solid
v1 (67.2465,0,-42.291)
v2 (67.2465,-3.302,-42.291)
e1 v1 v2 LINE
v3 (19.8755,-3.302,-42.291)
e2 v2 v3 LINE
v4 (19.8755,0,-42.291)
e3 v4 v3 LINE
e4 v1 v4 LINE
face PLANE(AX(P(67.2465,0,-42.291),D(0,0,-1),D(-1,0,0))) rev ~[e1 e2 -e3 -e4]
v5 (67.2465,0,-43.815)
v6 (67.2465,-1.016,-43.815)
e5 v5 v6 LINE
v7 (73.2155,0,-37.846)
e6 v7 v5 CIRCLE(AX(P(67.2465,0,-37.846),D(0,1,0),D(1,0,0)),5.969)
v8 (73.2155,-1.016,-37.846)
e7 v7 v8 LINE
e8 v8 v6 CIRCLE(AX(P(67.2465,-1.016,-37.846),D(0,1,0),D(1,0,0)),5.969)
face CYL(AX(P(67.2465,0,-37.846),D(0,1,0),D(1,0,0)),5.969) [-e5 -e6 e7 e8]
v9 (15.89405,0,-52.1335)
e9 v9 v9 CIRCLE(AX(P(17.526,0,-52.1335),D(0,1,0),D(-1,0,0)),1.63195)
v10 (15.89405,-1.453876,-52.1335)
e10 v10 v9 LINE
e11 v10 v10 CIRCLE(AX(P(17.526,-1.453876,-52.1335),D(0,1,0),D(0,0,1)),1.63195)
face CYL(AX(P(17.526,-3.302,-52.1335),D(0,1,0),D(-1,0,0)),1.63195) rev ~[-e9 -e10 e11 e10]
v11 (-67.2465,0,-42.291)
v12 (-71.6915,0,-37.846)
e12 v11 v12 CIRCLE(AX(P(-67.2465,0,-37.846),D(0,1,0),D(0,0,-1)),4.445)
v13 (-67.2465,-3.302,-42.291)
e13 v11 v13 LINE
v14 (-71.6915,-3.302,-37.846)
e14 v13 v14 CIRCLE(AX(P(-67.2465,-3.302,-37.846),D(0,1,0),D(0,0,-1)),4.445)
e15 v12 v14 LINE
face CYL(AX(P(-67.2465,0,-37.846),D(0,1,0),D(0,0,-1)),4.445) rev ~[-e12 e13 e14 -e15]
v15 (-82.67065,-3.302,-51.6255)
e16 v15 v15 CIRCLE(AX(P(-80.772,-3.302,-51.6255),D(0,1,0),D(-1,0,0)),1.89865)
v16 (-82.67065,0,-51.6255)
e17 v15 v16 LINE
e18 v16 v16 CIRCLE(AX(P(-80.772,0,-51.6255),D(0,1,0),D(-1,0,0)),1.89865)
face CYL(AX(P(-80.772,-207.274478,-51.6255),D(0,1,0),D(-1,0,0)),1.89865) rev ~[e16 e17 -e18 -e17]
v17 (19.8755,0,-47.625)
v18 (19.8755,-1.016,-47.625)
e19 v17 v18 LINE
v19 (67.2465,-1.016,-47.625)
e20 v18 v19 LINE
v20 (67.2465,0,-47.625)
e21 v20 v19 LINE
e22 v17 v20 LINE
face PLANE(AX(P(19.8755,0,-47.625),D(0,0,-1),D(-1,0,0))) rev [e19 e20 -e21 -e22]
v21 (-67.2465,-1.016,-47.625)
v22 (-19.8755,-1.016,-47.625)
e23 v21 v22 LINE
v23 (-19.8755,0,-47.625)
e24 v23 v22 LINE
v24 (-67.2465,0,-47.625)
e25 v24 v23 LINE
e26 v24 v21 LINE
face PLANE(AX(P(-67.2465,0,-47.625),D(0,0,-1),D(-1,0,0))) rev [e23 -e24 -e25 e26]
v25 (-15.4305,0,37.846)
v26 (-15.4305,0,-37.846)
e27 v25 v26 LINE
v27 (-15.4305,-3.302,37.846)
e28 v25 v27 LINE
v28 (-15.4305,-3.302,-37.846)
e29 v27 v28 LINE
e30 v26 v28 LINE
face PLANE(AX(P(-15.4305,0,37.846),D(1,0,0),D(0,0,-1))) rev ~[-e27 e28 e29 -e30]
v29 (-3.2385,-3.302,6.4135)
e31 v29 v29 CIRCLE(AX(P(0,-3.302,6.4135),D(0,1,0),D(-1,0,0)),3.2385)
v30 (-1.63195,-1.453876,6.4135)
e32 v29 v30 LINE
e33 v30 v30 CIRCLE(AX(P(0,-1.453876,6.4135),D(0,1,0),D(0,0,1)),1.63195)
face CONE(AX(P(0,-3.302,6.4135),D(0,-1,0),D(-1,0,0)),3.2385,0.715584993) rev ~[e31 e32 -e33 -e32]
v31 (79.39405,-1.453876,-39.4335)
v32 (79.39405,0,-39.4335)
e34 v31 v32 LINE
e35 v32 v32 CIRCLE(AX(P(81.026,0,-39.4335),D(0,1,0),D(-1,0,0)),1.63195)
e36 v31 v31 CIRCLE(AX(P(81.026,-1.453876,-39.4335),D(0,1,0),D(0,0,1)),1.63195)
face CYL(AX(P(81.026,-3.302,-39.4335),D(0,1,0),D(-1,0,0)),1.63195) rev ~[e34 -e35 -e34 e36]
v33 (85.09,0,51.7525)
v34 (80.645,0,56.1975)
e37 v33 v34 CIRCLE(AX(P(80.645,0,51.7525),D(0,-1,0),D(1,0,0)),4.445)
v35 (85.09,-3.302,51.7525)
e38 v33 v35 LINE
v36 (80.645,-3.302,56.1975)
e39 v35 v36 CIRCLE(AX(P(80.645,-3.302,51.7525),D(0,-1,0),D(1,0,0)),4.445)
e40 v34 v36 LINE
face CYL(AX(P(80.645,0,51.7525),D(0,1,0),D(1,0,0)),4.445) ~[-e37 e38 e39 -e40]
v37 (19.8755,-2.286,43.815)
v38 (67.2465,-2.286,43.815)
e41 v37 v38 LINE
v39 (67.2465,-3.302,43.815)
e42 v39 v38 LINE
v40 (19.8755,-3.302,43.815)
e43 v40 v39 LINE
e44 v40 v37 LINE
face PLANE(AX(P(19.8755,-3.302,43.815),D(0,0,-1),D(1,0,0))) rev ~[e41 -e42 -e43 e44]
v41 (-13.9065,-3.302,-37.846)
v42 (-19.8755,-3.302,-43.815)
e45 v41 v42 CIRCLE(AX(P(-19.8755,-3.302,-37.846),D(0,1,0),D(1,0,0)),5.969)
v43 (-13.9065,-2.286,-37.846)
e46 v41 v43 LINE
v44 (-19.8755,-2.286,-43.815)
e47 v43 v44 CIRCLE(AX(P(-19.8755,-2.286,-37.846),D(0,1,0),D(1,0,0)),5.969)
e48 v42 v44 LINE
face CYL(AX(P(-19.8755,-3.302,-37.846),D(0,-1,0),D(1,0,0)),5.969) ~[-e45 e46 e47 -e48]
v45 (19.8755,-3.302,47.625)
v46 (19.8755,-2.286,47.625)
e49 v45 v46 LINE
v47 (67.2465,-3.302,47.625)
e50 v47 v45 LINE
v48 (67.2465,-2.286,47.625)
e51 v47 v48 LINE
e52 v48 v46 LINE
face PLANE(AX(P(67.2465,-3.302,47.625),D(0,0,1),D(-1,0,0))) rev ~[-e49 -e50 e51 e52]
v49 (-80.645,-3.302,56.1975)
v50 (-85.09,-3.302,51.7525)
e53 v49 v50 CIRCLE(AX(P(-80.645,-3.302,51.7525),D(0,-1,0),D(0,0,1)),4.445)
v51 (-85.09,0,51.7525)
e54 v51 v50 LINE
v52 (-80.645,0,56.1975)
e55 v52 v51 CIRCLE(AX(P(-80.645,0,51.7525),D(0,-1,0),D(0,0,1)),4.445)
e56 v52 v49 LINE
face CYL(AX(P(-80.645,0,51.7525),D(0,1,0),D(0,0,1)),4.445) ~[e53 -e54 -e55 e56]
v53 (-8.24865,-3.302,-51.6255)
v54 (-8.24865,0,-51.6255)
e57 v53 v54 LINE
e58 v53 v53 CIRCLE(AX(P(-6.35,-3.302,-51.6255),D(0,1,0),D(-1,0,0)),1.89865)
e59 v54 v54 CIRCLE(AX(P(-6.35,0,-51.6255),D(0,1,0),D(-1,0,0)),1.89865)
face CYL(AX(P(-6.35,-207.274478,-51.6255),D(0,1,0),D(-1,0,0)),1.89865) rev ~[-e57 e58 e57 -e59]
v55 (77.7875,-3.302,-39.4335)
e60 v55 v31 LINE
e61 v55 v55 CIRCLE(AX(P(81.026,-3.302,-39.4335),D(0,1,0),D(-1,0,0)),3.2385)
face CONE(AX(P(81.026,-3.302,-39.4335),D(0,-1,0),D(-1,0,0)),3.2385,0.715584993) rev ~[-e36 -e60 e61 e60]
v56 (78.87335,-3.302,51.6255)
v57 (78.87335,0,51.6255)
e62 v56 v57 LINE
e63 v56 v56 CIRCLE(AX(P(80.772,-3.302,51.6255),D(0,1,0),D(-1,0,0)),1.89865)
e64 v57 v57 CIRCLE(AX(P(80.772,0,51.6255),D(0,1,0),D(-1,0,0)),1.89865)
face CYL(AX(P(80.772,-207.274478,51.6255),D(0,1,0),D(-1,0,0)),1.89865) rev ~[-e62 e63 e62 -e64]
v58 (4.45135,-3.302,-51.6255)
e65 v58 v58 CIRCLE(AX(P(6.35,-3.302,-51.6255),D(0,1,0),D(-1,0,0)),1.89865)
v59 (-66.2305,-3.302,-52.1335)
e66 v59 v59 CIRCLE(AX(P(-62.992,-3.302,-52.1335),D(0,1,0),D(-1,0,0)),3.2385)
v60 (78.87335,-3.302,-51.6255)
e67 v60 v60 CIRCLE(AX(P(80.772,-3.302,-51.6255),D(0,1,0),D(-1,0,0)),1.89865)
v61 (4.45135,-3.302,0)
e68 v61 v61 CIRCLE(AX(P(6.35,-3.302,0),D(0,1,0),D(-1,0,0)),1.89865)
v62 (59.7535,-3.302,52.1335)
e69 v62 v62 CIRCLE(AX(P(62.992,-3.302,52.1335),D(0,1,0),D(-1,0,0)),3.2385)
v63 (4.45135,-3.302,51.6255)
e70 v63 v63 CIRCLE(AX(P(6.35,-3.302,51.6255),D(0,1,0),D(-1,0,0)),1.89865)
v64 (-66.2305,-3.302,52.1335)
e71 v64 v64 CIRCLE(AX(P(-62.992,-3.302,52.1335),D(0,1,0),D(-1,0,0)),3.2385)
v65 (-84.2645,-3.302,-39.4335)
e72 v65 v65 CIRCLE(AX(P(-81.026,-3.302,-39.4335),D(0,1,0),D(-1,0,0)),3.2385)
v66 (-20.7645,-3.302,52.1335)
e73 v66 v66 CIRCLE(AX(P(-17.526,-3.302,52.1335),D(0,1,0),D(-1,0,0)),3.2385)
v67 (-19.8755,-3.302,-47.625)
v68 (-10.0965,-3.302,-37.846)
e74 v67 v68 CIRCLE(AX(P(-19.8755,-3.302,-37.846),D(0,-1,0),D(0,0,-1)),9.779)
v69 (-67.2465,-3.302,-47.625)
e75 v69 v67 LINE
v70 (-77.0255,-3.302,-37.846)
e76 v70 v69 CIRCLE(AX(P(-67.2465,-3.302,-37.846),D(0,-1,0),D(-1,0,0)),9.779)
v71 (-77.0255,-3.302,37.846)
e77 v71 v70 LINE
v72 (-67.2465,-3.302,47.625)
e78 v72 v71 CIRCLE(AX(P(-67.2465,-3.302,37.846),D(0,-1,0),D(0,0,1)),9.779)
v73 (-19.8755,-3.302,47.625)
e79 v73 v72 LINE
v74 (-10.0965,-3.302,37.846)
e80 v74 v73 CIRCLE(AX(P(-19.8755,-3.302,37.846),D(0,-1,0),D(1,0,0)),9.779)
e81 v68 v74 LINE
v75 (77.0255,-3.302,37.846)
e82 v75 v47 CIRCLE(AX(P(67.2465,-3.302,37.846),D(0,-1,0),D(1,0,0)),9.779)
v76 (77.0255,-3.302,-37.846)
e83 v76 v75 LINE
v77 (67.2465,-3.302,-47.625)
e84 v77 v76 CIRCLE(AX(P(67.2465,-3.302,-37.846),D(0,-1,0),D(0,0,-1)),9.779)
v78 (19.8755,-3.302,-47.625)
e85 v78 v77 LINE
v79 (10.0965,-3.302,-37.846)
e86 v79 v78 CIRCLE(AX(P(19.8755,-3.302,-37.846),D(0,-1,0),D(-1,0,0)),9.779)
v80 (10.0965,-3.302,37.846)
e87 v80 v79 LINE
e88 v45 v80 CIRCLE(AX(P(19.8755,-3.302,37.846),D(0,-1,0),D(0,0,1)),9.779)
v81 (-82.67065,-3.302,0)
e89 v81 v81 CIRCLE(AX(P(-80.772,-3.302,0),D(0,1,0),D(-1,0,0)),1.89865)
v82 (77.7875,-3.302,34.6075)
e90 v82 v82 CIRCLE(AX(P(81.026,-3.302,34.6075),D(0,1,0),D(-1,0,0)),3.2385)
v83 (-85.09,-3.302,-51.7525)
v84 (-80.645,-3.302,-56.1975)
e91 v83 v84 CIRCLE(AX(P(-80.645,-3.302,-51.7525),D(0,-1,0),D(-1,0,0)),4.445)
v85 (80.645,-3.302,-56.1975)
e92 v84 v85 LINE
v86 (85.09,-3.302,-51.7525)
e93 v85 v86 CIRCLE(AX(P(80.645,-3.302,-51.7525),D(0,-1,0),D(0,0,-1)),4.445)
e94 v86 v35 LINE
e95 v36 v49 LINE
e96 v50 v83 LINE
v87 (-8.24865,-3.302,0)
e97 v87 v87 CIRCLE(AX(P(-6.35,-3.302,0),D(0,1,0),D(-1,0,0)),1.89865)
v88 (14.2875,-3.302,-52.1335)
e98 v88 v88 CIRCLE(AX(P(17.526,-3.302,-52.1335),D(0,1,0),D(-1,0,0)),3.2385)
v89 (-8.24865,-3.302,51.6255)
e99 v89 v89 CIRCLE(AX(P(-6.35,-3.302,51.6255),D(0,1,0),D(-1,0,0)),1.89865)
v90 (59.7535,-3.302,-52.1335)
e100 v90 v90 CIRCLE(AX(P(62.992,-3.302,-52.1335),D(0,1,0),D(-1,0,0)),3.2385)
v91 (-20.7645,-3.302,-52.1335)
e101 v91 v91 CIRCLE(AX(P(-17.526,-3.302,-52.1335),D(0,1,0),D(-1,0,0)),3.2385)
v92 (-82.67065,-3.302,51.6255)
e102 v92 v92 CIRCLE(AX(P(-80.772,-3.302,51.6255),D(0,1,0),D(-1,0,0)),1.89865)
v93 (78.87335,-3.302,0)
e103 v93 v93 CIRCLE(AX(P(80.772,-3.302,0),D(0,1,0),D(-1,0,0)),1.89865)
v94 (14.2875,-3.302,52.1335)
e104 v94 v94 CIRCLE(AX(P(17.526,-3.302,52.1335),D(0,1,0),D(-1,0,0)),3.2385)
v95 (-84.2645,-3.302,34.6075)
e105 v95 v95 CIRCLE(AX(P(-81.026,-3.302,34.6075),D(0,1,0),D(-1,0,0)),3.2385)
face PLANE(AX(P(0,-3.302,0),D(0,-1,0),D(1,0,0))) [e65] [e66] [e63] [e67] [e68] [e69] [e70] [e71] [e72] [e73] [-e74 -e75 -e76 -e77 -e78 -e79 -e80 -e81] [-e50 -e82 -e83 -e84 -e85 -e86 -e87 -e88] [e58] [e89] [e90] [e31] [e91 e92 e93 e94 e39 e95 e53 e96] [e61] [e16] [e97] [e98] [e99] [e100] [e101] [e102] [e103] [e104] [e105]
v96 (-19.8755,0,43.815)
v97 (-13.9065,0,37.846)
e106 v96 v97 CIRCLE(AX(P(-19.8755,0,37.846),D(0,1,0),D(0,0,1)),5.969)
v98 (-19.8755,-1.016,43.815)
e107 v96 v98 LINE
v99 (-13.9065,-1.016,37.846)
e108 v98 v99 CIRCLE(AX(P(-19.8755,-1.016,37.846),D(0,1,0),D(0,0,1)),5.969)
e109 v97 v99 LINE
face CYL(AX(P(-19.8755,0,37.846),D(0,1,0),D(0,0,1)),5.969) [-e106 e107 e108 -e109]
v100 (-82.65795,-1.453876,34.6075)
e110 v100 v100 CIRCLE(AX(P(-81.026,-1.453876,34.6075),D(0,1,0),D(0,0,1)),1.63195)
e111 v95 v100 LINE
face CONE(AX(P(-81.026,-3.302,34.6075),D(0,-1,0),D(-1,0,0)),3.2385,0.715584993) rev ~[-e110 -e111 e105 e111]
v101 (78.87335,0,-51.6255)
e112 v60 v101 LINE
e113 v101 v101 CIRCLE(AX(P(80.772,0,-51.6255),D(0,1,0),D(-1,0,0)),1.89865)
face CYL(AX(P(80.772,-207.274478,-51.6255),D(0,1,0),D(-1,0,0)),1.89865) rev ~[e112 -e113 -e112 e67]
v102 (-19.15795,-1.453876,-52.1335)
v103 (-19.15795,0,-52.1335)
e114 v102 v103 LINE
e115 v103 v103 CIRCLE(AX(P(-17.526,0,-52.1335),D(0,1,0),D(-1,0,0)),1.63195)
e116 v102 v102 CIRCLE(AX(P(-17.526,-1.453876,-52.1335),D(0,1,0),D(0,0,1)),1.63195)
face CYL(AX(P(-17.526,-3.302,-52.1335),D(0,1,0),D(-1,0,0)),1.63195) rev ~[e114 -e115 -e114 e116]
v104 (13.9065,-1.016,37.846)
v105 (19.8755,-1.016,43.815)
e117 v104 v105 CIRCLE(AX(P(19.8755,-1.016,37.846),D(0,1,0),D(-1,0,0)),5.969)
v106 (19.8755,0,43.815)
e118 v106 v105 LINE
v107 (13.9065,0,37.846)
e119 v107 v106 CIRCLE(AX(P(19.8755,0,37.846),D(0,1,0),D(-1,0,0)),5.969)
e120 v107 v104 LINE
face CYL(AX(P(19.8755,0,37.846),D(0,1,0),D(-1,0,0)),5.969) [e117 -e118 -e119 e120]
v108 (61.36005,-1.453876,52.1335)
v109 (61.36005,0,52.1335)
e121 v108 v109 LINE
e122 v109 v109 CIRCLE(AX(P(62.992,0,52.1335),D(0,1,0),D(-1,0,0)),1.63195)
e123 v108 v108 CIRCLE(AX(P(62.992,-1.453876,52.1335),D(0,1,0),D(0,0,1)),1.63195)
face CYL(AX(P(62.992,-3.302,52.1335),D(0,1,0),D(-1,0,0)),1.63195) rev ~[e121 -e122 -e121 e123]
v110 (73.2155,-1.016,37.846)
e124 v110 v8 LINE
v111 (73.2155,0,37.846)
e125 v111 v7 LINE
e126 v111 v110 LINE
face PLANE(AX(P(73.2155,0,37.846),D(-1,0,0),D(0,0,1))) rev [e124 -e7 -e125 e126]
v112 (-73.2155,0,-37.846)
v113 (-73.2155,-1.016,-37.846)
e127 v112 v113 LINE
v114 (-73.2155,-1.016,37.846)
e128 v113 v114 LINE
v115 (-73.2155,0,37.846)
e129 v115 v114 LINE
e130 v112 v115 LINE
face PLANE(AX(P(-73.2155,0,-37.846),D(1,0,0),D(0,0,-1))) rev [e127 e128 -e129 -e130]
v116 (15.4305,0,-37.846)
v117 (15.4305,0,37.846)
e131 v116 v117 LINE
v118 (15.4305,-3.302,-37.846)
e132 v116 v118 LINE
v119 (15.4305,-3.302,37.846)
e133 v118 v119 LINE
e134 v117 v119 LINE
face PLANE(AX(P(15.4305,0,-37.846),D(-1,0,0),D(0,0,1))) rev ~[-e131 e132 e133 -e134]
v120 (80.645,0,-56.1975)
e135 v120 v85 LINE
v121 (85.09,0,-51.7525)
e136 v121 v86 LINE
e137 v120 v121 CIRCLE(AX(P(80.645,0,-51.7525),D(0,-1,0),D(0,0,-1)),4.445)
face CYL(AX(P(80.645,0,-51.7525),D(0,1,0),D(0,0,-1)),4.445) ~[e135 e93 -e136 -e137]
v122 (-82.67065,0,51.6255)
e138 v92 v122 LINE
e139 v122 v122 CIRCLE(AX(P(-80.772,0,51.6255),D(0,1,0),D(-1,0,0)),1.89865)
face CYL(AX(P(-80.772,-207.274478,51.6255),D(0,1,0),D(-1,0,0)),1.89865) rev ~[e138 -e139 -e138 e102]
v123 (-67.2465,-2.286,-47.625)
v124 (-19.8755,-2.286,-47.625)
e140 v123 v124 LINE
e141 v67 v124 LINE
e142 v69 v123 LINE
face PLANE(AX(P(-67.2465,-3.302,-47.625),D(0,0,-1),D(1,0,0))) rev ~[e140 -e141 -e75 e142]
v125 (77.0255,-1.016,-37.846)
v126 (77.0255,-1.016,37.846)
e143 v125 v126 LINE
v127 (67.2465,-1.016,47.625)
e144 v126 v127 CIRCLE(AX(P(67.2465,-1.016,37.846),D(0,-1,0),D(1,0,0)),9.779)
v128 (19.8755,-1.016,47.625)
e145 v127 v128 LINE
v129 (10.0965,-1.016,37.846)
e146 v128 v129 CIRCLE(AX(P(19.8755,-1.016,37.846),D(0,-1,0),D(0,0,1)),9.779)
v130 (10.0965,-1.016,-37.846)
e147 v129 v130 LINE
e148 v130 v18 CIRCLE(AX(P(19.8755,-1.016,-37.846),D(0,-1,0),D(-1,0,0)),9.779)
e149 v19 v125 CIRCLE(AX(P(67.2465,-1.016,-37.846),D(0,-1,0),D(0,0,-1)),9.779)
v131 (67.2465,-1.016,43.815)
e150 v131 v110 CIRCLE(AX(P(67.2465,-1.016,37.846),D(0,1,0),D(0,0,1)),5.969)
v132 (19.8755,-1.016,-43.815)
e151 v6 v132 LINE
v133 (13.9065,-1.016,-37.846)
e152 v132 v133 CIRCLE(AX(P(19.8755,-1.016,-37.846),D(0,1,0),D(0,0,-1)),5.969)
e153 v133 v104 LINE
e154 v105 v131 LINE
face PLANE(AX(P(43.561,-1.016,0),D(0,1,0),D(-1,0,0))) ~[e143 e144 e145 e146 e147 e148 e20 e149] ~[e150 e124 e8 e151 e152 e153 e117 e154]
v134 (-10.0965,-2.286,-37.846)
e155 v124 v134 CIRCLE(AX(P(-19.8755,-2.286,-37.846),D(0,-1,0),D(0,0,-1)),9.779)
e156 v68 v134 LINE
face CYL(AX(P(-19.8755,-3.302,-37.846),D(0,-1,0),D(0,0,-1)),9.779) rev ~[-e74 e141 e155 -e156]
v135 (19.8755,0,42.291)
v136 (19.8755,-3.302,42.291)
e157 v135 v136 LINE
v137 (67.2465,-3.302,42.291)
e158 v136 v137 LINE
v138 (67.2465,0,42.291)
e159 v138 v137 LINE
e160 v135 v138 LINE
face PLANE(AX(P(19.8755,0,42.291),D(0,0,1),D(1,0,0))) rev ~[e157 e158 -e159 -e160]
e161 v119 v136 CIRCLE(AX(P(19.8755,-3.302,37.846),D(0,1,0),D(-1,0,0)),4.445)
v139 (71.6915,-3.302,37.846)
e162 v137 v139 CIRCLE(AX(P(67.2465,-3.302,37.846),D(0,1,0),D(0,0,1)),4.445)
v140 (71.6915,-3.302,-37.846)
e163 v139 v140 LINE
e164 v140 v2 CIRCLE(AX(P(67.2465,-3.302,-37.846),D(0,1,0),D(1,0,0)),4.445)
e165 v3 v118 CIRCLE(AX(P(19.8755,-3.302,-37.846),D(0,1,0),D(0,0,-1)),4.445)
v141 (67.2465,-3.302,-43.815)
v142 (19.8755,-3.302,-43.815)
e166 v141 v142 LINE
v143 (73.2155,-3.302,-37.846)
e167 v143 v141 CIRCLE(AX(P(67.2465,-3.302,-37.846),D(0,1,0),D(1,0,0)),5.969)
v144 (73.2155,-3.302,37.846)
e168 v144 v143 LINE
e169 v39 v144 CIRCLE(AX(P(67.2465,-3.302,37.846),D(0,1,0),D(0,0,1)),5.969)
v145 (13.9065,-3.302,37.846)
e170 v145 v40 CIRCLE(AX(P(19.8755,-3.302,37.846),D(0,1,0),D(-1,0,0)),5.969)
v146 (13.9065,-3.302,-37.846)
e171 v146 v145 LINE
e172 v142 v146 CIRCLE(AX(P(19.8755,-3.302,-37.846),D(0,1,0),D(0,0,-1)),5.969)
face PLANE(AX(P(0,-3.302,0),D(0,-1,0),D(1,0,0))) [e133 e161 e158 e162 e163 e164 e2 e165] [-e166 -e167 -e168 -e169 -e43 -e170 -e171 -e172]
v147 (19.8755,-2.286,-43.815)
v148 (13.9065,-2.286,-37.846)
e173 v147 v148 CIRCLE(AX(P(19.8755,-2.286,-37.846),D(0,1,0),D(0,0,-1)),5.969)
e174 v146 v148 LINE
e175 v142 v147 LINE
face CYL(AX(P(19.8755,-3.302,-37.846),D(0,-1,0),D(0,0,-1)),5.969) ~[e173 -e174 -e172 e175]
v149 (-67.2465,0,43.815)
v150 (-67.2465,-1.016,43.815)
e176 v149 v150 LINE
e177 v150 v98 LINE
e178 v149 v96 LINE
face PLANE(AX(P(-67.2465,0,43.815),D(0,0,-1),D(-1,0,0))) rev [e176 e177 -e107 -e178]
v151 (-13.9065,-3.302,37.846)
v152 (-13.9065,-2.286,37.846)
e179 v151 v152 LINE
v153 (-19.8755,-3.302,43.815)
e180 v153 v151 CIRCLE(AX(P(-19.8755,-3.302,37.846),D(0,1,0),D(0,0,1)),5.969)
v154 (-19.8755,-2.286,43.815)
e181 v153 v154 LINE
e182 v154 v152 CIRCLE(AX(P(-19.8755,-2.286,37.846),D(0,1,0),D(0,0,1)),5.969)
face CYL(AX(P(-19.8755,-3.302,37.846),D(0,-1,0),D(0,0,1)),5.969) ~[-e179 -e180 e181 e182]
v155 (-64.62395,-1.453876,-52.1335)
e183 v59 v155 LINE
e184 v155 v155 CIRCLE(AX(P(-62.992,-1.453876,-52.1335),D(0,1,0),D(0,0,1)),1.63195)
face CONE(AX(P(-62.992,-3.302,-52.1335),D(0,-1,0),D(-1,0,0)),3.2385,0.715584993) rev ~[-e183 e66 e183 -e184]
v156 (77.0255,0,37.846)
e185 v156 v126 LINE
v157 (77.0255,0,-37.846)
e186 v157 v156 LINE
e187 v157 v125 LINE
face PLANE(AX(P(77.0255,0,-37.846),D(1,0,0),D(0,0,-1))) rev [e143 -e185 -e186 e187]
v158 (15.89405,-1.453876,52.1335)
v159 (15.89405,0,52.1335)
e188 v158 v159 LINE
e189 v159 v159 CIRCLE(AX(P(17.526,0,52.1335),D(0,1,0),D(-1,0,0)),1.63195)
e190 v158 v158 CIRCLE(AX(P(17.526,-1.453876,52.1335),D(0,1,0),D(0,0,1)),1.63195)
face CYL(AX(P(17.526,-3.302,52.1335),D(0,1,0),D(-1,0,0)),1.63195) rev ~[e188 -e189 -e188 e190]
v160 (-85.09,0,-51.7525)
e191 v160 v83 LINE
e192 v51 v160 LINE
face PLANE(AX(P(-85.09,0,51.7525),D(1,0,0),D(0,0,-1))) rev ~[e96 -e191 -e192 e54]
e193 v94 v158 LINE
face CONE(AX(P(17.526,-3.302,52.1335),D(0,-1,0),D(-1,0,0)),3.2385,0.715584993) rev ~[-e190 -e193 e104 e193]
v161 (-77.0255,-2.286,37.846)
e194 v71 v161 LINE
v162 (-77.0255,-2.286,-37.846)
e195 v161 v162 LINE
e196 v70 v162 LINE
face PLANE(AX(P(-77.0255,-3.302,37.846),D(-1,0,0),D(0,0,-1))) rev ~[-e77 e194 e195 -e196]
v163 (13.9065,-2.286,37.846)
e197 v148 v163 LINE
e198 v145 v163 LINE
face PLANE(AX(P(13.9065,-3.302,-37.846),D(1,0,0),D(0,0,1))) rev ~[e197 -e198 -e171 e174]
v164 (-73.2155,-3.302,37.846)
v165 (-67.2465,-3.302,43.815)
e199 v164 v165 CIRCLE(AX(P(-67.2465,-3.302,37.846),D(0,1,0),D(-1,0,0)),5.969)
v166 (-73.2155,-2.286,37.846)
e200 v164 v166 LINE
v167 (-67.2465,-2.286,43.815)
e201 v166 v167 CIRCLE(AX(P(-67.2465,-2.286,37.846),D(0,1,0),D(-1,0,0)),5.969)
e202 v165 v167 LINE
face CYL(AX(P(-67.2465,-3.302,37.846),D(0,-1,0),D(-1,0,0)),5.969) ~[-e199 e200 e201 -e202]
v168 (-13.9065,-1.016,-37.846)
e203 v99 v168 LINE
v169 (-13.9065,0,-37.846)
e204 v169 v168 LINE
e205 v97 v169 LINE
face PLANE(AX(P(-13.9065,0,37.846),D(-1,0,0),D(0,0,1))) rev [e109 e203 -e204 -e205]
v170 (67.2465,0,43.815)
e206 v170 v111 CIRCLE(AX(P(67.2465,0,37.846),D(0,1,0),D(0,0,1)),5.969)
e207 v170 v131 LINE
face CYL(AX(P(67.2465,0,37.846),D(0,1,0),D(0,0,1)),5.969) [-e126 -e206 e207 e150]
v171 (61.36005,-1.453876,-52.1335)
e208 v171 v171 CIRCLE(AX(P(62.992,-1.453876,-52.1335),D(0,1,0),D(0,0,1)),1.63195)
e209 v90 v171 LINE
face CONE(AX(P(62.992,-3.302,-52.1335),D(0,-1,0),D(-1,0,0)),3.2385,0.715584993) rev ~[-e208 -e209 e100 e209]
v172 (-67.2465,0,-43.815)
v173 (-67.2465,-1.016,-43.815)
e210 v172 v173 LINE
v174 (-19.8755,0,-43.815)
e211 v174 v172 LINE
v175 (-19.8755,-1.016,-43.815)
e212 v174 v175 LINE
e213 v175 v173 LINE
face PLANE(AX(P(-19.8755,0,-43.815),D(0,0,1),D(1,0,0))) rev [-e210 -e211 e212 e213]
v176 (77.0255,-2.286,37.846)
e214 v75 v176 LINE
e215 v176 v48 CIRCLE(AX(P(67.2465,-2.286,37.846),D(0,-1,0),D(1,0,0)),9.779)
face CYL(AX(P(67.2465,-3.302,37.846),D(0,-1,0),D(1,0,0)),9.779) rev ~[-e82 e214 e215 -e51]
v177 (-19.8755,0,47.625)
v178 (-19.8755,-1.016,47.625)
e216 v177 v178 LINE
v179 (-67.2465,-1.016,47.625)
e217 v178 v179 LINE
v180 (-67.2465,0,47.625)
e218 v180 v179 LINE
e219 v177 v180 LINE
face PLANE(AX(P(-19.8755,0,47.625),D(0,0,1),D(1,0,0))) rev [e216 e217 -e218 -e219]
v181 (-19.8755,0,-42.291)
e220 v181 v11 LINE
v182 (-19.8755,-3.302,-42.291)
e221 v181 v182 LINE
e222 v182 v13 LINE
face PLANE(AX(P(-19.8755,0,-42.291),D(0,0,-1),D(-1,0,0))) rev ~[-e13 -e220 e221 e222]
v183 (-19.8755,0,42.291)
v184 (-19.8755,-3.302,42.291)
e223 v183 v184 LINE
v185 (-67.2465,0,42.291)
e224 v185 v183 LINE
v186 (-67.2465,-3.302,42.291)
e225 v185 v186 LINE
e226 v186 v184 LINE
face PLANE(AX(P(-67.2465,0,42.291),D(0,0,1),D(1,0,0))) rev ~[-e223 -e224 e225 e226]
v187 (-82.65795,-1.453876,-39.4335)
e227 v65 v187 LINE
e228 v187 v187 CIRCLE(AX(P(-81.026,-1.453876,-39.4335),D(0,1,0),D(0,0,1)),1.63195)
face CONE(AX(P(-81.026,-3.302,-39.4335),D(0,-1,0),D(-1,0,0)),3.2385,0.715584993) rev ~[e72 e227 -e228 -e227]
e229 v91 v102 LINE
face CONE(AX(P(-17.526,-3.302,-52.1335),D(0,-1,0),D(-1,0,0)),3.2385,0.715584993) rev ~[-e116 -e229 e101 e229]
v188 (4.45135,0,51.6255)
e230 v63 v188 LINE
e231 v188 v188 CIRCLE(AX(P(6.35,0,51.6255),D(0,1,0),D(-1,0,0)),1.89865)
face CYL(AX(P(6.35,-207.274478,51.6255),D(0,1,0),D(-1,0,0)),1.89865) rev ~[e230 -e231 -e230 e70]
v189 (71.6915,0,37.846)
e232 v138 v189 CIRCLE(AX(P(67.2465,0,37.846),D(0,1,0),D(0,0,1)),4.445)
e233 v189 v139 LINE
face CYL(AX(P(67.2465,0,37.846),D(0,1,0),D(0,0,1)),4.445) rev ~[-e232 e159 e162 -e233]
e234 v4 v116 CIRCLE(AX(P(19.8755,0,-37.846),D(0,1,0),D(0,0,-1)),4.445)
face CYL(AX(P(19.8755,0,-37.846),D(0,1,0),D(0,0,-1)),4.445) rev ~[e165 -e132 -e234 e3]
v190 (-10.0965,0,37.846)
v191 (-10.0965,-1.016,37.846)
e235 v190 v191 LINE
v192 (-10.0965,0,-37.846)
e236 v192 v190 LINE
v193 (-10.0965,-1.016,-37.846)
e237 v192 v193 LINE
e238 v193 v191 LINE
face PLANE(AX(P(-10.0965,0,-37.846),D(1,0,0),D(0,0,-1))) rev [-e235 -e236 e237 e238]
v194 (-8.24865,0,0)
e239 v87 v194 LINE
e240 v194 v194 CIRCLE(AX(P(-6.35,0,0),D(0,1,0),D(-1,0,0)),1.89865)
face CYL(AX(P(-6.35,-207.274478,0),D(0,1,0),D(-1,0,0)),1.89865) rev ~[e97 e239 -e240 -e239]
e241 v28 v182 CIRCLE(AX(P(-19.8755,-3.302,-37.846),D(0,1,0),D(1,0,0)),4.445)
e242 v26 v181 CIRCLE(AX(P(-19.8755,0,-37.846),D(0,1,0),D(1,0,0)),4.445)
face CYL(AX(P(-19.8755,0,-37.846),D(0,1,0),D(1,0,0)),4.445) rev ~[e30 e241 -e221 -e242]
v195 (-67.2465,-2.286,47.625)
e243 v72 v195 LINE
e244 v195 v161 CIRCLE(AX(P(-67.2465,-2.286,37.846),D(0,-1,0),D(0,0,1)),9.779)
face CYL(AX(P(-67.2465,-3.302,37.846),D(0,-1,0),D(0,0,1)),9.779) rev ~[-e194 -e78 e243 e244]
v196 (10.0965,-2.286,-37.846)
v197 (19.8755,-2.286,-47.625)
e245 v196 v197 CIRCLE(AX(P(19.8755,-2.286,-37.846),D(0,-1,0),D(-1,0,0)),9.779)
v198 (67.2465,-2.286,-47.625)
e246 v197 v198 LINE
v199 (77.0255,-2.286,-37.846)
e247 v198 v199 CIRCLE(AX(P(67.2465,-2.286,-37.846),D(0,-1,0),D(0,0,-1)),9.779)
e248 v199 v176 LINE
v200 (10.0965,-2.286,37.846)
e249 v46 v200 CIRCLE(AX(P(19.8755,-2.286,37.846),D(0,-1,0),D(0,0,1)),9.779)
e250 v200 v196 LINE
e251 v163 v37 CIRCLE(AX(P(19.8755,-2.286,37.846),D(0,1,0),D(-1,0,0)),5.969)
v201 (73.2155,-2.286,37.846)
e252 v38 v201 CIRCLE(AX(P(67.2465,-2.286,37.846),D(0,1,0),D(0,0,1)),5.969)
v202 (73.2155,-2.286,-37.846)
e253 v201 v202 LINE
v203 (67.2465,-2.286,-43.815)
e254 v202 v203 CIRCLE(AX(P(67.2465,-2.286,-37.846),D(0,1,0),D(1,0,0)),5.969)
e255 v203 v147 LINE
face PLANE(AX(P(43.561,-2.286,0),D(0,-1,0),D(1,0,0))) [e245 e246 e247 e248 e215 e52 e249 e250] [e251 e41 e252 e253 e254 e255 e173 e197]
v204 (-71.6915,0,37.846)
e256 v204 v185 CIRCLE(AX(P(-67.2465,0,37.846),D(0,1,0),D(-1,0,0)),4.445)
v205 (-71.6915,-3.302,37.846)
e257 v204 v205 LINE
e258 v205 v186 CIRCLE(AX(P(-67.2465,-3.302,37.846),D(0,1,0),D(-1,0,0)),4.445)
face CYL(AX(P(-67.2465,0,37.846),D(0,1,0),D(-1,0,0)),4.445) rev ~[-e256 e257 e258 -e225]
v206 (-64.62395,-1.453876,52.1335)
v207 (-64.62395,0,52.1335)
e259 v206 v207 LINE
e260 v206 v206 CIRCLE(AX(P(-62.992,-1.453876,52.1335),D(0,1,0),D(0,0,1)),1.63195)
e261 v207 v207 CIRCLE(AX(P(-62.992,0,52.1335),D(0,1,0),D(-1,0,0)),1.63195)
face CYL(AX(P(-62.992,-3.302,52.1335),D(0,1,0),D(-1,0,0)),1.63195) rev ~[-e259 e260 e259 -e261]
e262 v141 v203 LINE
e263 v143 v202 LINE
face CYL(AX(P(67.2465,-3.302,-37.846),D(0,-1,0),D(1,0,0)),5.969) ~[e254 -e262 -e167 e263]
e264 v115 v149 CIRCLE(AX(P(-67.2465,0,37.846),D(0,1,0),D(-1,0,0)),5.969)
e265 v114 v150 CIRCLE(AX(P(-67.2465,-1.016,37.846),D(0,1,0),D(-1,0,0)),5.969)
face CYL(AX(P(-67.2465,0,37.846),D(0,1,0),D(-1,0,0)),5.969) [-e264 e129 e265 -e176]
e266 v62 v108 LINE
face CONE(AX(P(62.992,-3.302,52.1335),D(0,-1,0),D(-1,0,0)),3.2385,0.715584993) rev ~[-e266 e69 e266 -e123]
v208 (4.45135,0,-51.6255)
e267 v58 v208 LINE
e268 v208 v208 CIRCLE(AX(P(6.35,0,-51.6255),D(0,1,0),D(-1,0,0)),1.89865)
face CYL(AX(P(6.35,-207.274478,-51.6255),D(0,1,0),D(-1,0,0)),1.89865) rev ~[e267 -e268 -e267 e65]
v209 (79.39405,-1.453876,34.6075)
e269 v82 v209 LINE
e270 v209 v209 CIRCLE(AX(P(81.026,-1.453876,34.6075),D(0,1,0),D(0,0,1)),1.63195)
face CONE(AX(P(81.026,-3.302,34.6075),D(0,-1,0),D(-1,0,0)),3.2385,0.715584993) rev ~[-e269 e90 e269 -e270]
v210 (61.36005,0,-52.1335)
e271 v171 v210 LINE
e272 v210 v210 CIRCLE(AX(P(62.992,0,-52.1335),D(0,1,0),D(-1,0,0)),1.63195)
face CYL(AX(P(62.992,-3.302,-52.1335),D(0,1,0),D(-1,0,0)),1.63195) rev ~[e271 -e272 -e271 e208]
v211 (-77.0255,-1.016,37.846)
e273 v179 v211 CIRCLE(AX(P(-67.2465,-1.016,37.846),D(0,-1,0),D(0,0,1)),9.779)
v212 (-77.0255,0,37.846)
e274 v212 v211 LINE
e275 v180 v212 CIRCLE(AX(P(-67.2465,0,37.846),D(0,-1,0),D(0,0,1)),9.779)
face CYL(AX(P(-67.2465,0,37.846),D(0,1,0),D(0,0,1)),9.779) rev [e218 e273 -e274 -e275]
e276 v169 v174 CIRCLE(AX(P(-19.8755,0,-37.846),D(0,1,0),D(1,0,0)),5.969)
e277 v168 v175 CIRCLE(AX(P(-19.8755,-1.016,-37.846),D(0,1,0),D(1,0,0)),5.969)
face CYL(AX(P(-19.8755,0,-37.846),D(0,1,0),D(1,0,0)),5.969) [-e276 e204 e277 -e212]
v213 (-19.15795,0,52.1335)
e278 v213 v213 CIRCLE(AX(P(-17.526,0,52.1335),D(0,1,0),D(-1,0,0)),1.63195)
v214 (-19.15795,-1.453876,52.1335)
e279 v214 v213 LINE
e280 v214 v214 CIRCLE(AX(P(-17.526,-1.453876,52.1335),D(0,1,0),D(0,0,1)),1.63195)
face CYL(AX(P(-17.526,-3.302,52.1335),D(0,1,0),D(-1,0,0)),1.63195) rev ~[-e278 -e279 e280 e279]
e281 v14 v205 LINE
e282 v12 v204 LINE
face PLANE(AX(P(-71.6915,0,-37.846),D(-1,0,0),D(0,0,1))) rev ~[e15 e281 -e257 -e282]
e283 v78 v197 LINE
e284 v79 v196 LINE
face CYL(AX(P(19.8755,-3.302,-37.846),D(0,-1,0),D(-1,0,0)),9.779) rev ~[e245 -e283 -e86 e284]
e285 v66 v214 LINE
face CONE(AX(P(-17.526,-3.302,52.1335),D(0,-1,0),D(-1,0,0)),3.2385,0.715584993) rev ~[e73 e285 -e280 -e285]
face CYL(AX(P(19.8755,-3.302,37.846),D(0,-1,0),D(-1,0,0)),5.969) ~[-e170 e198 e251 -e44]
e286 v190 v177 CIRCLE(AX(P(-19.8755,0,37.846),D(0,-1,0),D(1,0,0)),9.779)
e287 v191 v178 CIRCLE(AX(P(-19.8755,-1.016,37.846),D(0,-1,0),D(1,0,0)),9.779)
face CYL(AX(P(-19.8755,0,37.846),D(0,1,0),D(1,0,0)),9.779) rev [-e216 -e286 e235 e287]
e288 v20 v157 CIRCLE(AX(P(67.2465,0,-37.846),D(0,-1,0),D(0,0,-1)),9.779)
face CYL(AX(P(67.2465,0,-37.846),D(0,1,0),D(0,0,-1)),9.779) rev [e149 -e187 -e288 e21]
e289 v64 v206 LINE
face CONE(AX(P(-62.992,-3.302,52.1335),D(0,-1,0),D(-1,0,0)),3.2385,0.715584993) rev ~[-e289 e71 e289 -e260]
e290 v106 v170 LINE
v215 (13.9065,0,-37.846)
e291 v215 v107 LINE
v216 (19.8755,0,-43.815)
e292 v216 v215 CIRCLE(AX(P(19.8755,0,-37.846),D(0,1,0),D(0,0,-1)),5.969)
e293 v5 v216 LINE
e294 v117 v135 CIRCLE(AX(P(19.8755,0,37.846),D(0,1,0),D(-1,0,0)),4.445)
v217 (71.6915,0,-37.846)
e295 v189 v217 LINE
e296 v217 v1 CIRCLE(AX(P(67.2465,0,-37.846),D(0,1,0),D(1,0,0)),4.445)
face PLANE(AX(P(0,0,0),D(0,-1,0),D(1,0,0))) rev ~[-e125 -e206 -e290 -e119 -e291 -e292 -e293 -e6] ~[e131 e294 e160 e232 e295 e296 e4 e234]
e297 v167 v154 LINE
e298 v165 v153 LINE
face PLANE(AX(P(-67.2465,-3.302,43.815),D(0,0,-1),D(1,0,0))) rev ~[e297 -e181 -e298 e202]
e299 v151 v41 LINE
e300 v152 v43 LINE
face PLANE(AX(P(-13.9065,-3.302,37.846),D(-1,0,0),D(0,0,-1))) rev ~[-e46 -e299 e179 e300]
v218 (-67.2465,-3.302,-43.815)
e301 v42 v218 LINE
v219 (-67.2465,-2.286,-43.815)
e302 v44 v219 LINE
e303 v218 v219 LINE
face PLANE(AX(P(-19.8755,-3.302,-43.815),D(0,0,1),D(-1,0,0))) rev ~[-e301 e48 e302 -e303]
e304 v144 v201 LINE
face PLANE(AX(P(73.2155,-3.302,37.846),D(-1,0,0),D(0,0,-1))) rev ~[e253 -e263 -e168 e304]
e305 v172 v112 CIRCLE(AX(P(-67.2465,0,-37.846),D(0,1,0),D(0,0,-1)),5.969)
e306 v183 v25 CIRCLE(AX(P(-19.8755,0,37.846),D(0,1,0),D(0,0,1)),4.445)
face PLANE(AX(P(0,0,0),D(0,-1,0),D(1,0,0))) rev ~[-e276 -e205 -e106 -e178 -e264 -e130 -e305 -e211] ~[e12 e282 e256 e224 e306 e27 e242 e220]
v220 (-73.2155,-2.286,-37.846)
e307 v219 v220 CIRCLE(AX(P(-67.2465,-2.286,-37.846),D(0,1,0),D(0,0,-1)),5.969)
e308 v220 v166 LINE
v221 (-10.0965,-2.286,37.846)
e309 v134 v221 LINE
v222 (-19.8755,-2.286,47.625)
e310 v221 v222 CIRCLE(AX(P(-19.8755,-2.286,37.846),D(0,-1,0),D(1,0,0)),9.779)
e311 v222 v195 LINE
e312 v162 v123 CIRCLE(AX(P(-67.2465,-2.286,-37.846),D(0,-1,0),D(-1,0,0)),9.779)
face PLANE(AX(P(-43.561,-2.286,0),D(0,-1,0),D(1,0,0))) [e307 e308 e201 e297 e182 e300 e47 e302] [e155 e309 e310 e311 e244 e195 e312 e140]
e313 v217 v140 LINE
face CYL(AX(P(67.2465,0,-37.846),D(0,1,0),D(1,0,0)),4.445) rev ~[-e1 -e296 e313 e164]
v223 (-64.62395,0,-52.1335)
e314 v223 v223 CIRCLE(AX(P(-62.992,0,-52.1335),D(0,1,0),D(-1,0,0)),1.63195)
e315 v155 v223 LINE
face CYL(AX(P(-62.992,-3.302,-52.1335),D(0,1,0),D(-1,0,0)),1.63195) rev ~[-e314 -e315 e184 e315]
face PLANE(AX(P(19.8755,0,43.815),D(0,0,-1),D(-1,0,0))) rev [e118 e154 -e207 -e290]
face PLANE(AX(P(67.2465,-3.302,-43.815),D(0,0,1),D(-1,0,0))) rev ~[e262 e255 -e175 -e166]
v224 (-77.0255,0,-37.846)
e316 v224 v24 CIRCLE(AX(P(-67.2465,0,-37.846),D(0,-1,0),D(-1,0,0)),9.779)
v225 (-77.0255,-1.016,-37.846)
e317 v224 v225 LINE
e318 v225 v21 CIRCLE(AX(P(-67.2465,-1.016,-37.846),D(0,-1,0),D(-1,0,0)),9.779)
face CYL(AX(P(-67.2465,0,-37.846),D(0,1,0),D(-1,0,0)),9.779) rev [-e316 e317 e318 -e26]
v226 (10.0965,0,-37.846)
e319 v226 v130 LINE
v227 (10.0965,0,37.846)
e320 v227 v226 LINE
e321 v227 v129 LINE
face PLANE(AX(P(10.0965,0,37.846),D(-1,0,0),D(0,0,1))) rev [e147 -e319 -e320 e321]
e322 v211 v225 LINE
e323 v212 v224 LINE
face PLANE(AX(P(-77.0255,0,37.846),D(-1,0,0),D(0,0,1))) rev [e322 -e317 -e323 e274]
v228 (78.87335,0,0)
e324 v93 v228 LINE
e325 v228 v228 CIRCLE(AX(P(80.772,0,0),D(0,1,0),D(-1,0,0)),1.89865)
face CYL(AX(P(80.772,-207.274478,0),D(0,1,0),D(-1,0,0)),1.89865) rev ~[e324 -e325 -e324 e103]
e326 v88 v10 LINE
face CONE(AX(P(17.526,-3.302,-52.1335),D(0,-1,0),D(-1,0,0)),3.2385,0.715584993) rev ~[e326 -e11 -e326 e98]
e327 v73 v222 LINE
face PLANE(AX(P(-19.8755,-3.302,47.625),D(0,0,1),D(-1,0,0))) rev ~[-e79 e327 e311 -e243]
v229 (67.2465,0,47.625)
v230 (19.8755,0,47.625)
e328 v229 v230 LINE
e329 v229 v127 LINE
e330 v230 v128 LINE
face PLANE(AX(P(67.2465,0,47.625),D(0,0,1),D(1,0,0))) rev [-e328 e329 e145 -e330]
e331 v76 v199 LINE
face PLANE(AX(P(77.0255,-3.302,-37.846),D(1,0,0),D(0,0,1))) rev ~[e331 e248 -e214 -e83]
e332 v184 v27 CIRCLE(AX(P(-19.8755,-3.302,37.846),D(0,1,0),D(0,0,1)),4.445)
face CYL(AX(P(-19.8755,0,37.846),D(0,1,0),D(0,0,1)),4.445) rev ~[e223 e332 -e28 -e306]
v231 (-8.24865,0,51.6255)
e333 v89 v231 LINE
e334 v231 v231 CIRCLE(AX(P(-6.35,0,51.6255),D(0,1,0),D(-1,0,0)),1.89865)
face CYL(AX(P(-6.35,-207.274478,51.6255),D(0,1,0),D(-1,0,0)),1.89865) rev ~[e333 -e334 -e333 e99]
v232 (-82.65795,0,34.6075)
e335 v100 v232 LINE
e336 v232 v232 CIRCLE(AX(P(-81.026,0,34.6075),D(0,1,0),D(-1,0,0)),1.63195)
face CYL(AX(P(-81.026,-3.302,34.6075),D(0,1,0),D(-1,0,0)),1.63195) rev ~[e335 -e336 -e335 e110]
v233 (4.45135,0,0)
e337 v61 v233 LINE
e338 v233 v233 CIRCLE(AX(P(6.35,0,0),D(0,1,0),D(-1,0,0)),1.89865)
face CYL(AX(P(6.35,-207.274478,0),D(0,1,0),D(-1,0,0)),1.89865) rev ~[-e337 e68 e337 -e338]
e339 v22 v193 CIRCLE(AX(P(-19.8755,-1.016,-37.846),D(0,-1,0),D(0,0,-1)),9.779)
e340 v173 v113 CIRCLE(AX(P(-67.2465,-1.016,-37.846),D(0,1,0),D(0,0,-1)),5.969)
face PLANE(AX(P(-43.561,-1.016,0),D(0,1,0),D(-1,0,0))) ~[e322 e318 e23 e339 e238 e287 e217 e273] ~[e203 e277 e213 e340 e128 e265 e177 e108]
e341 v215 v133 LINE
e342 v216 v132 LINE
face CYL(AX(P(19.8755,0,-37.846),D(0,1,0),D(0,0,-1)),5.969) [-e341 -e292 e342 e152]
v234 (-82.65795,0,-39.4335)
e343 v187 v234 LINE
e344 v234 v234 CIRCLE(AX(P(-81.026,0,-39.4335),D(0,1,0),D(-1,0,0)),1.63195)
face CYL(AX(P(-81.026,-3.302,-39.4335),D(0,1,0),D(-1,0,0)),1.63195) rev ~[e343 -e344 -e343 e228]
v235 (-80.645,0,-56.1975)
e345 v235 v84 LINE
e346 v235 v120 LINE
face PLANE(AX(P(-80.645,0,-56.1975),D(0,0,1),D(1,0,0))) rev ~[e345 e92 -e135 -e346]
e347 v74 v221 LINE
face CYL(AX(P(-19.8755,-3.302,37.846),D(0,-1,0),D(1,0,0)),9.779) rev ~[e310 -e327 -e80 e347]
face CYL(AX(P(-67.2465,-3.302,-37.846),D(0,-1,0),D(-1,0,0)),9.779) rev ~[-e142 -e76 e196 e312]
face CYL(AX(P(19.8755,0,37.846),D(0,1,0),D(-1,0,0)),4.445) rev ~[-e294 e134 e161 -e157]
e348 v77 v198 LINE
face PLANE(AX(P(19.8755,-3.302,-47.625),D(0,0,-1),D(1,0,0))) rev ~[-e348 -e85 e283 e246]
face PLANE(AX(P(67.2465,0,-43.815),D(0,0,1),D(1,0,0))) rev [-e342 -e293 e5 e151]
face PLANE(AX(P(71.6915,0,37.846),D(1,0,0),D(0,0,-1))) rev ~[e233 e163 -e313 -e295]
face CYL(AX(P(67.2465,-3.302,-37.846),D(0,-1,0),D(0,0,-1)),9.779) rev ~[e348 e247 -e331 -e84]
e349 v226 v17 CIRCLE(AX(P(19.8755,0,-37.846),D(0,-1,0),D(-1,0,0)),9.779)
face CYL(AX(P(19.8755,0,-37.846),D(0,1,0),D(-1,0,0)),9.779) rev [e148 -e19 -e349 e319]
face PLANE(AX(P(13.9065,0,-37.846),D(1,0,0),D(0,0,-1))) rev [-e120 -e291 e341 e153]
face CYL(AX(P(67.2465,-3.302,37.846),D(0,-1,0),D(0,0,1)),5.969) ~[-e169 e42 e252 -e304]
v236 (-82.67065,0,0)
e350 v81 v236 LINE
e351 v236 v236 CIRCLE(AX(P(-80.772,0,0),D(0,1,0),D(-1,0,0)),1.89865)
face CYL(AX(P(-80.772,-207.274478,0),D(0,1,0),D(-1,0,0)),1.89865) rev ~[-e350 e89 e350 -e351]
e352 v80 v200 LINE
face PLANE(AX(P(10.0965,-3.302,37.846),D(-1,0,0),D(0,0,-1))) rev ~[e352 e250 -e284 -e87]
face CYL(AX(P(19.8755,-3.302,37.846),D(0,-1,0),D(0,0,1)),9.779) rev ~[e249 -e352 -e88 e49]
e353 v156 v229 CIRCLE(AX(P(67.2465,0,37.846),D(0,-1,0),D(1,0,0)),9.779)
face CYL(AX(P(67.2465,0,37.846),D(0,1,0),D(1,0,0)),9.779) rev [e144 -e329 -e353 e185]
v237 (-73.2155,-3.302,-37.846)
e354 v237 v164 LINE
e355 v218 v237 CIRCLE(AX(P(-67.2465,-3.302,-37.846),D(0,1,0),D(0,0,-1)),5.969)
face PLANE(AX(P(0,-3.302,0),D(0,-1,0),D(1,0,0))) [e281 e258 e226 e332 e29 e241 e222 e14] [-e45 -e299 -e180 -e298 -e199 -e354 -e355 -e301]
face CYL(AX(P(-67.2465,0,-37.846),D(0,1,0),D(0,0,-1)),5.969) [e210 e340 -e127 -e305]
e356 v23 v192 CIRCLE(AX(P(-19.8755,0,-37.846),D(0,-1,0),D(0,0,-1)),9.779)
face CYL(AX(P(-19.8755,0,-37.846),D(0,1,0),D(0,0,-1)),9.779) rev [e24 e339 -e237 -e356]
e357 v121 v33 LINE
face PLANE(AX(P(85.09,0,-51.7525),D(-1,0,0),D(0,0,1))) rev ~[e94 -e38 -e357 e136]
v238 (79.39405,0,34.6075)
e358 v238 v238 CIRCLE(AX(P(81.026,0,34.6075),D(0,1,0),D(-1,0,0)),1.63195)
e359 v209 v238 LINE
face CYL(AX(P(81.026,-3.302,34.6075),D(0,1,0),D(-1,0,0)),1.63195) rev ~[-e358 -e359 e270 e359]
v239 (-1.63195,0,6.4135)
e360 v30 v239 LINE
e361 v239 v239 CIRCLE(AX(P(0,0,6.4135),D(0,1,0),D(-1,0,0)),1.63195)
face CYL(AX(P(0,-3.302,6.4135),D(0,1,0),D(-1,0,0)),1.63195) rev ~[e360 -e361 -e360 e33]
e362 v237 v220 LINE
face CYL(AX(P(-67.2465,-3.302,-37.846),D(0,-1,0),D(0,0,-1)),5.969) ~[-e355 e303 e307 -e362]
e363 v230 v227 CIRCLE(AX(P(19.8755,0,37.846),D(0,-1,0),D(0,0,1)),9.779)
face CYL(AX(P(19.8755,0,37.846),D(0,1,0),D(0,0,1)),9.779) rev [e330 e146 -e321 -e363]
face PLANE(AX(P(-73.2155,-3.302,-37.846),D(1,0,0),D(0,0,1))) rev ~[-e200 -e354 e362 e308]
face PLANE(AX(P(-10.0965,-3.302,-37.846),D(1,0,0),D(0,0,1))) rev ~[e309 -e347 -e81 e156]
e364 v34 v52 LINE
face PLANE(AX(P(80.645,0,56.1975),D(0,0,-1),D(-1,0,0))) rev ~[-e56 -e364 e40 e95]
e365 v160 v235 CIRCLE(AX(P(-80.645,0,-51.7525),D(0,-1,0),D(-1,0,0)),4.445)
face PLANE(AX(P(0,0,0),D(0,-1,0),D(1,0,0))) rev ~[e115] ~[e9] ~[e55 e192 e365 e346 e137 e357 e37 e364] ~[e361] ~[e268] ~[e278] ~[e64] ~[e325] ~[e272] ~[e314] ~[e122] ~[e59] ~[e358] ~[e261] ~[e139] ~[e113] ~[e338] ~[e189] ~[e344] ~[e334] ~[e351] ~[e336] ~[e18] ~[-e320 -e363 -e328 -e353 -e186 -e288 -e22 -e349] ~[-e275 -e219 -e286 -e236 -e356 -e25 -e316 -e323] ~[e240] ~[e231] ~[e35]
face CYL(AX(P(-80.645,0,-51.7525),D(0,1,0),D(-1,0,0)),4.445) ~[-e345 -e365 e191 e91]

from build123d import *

# Parameters (mm, degrees)
F1_DEPTH       = 3.302
F3_DEPTH       = 1.016
F6_D           = 3.2639
F6_CSINK_D     = 6.477
F6_CSINK_ANGLE = 82
F8_D           = 3.7973


# Not quite as in the source:
# - a pattern or mirror of a feature is missing from the dataset's text; its kind, count and spacing are read off the source's solid


with BuildPart() as f1:
    # F0 (on Front) → F1 (new body)
    with BuildSketch(Plane.XZ):
        with BuildLine():
            ThreePointArc((-85.09, -51.7525), (-83.7880896424, -54.8955896424), (-80.645, -56.1975))
            Line((-80.645, -56.1975), (80.645, -56.1975))
            ThreePointArc((80.645, -56.1975), (83.7880896424, -54.8955896424), (85.09, -51.7525))
            Line((85.09, -51.7525), (85.09, 51.7525))
            ThreePointArc((85.09, 51.7525), (83.7880896424, 54.8955896424), (80.645, 56.1975))
            Line((80.645, 56.1975), (-80.645, 56.1975))
            ThreePointArc((-80.645, 56.1975), (-83.7880896424, 54.8955896424), (-85.09, 51.7525))
            Line((-85.09, 51.7525), (-85.09, -51.7525))
        make_face()
        with BuildLine():
            ThreePointArc((-15.4305, -37.846), (-16.7324103576, -40.9890896424), (-19.8755, -42.291))
            Line((-19.8755, -42.291), (-67.2465, -42.291))
            ThreePointArc((-67.2465, -42.291), (-70.3895896424, -40.9890896424), (-71.6915, -37.846))
            Line((-71.6915, -37.846), (-71.6915, 37.846))
            ThreePointArc((-71.6915, 37.846), (-70.3895896424, 40.9890896424), (-67.2465, 42.291))
            Line((-67.2465, 42.291), (-19.8755, 42.291))
            ThreePointArc((-19.8755, 42.291), (-16.7324103576, 40.9890896424), (-15.4305, 37.846))
            Line((-15.4305, 37.846), (-15.4305, -37.846))
        make_face(mode=Mode.SUBTRACT)
        with BuildLine():
            Line((19.8755, 42.291), (67.2465, 42.291))
            ThreePointArc((67.2465, 42.291), (70.3895896424, 40.9890896424), (71.6915, 37.846))
            Line((71.6915, 37.846), (71.6915, -37.846))
            ThreePointArc((71.6915, -37.846), (70.3895896424, -40.9890896424), (67.2465, -42.291))
            Line((67.2465, -42.291), (19.8755, -42.291))
            ThreePointArc((19.8755, -42.291), (16.7324103576, -40.9890896424), (15.4305, -37.846))
            Line((15.4305, -37.846), (15.4305, 37.846))
            ThreePointArc((15.4305, 37.846), (16.7324103576, 40.9890896424), (19.8755, 42.291))
        make_face(mode=Mode.SUBTRACT)
    extrude(amount=F1_DEPTH)

    # F2 (on face) → F3 (cut)
    with BuildSketch(Plane.XZ.offset(3.302)):
        with BuildLine():
            ThreePointArc((-10.0965, 37.846), (-12.9607027868, 44.7607972132), (-19.8755, 47.625))
            Line((-19.8755, 47.625), (-67.2465, 47.625))
            ThreePointArc((-67.2465, 47.625), (-74.1612972132, 44.7607972132), (-77.0255, 37.846))
            Line((-77.0255, 37.846), (-77.0255, -37.846))
            ThreePointArc((-77.0255, -37.846), (-74.1612972132, -44.7607972132), (-67.2465, -47.625))
            Line((-67.2465, -47.625), (-19.8755, -47.625))
            ThreePointArc((-19.8755, -47.625), (-12.9607027868, -44.7607972132), (-10.0965, -37.846))
            Line((-10.0965, -37.846), (-10.0965, 37.846))
        make_face()
        with BuildLine():
            ThreePointArc((-19.8755, 43.815), (-15.6547796231, 42.0667203769), (-13.9065, 37.846))
            Line((-13.9065, 37.846), (-13.9065, -37.846))
            ThreePointArc((-13.9065, -37.846), (-15.6547796231, -42.0667203769), (-19.8755, -43.815))
            Line((-19.8755, -43.815), (-67.2465, -43.815))
            ThreePointArc((-67.2465, -43.815), (-71.4672203769, -42.0667203769), (-73.2155, -37.846))
            Line((-73.2155, -37.846), (-73.2155, 37.846))
            ThreePointArc((-73.2155, 37.846), (-71.4672203769, 42.0667203769), (-67.2465, 43.815))
            Line((-67.2465, 43.815), (-19.8755, 43.815))
        make_face(mode=Mode.SUBTRACT)
        with BuildLine():
            ThreePointArc((10.0965, -37.846), (12.9607027868, -44.7607972132), (19.8755, -47.625))
            Line((19.8755, -47.625), (67.2465, -47.625))
            ThreePointArc((67.2465, -47.625), (74.1612972132, -44.7607972132), (77.0255, -37.846))
            Line((77.0255, -37.846), (77.0255, 37.846))
            ThreePointArc((77.0255, 37.846), (74.1612972132, 44.7607972132), (67.2465, 47.625))
            Line((67.2465, 47.625), (19.8755, 47.625))
            ThreePointArc((19.8755, 47.625), (12.9607027868, 44.7607972132), (10.0965, 37.846))
            Line((10.0965, 37.846), (10.0965, -37.846))
        make_face()
        with BuildLine():
            Line((73.2155, 37.846), (73.2155, -37.846))
            ThreePointArc((73.2155, -37.846), (71.4672203769, -42.0667203769), (67.2465, -43.815))
            Line((67.2465, -43.815), (19.8755, -43.815))
            ThreePointArc((19.8755, -43.815), (15.6547796231, -42.0667203769), (13.9065, -37.846))
            Line((13.9065, -37.846), (13.9065, 37.846))
            ThreePointArc((13.9065, 37.846), (15.6547796231, 42.0667203769), (19.8755, 43.815))
            Line((19.8755, 43.815), (67.2465, 43.815))
            ThreePointArc((67.2465, 43.815), (71.4672203769, 42.0667203769), (73.2155, 37.846))
        make_face(mode=Mode.SUBTRACT)
    f3 = extrude(amount=-F3_DEPTH, mode=Mode.SUBTRACT)

    # F3_copies: F3 across plane
    add(f3.mirror(Plane.ZX.offset(-1.651)), mode=Mode.SUBTRACT)

    # F6 (through all)
    with Locations(Plane.XZ.offset(3.302)):
        with Locations((-81.026, 34.6075), (-81.026, -39.4335), (-62.992, 52.1335), (-17.526, 52.1335), (0, 6.4135), (-62.992, -52.1335), (-17.526, -52.1335), (17.526, -52.1335), (62.992, -52.1335), (81.026, -39.4335), (81.026, 34.6075), (62.992, 52.1335), (17.526, 52.1335)):
            CounterSinkHole(F6_D / 2, F6_CSINK_D / 2, counter_sink_angle=F6_CSINK_ANGLE)

    # F8 (through all)
    with Locations(Plane.XZ.offset(3.302)):
        with Locations((-80.772, 51.6255), (-80.772, 0), (-80.772, -51.6255), (-6.35, -51.6255), (-6.35, 0), (6.35, 0), (-6.35, 51.6255), (6.35, 51.6255), (6.35, -51.6255), (80.772, -51.6255), (80.772, 51.6255), (80.772, 0)):
            Hole(F8_D / 2)


solid = f1.part
